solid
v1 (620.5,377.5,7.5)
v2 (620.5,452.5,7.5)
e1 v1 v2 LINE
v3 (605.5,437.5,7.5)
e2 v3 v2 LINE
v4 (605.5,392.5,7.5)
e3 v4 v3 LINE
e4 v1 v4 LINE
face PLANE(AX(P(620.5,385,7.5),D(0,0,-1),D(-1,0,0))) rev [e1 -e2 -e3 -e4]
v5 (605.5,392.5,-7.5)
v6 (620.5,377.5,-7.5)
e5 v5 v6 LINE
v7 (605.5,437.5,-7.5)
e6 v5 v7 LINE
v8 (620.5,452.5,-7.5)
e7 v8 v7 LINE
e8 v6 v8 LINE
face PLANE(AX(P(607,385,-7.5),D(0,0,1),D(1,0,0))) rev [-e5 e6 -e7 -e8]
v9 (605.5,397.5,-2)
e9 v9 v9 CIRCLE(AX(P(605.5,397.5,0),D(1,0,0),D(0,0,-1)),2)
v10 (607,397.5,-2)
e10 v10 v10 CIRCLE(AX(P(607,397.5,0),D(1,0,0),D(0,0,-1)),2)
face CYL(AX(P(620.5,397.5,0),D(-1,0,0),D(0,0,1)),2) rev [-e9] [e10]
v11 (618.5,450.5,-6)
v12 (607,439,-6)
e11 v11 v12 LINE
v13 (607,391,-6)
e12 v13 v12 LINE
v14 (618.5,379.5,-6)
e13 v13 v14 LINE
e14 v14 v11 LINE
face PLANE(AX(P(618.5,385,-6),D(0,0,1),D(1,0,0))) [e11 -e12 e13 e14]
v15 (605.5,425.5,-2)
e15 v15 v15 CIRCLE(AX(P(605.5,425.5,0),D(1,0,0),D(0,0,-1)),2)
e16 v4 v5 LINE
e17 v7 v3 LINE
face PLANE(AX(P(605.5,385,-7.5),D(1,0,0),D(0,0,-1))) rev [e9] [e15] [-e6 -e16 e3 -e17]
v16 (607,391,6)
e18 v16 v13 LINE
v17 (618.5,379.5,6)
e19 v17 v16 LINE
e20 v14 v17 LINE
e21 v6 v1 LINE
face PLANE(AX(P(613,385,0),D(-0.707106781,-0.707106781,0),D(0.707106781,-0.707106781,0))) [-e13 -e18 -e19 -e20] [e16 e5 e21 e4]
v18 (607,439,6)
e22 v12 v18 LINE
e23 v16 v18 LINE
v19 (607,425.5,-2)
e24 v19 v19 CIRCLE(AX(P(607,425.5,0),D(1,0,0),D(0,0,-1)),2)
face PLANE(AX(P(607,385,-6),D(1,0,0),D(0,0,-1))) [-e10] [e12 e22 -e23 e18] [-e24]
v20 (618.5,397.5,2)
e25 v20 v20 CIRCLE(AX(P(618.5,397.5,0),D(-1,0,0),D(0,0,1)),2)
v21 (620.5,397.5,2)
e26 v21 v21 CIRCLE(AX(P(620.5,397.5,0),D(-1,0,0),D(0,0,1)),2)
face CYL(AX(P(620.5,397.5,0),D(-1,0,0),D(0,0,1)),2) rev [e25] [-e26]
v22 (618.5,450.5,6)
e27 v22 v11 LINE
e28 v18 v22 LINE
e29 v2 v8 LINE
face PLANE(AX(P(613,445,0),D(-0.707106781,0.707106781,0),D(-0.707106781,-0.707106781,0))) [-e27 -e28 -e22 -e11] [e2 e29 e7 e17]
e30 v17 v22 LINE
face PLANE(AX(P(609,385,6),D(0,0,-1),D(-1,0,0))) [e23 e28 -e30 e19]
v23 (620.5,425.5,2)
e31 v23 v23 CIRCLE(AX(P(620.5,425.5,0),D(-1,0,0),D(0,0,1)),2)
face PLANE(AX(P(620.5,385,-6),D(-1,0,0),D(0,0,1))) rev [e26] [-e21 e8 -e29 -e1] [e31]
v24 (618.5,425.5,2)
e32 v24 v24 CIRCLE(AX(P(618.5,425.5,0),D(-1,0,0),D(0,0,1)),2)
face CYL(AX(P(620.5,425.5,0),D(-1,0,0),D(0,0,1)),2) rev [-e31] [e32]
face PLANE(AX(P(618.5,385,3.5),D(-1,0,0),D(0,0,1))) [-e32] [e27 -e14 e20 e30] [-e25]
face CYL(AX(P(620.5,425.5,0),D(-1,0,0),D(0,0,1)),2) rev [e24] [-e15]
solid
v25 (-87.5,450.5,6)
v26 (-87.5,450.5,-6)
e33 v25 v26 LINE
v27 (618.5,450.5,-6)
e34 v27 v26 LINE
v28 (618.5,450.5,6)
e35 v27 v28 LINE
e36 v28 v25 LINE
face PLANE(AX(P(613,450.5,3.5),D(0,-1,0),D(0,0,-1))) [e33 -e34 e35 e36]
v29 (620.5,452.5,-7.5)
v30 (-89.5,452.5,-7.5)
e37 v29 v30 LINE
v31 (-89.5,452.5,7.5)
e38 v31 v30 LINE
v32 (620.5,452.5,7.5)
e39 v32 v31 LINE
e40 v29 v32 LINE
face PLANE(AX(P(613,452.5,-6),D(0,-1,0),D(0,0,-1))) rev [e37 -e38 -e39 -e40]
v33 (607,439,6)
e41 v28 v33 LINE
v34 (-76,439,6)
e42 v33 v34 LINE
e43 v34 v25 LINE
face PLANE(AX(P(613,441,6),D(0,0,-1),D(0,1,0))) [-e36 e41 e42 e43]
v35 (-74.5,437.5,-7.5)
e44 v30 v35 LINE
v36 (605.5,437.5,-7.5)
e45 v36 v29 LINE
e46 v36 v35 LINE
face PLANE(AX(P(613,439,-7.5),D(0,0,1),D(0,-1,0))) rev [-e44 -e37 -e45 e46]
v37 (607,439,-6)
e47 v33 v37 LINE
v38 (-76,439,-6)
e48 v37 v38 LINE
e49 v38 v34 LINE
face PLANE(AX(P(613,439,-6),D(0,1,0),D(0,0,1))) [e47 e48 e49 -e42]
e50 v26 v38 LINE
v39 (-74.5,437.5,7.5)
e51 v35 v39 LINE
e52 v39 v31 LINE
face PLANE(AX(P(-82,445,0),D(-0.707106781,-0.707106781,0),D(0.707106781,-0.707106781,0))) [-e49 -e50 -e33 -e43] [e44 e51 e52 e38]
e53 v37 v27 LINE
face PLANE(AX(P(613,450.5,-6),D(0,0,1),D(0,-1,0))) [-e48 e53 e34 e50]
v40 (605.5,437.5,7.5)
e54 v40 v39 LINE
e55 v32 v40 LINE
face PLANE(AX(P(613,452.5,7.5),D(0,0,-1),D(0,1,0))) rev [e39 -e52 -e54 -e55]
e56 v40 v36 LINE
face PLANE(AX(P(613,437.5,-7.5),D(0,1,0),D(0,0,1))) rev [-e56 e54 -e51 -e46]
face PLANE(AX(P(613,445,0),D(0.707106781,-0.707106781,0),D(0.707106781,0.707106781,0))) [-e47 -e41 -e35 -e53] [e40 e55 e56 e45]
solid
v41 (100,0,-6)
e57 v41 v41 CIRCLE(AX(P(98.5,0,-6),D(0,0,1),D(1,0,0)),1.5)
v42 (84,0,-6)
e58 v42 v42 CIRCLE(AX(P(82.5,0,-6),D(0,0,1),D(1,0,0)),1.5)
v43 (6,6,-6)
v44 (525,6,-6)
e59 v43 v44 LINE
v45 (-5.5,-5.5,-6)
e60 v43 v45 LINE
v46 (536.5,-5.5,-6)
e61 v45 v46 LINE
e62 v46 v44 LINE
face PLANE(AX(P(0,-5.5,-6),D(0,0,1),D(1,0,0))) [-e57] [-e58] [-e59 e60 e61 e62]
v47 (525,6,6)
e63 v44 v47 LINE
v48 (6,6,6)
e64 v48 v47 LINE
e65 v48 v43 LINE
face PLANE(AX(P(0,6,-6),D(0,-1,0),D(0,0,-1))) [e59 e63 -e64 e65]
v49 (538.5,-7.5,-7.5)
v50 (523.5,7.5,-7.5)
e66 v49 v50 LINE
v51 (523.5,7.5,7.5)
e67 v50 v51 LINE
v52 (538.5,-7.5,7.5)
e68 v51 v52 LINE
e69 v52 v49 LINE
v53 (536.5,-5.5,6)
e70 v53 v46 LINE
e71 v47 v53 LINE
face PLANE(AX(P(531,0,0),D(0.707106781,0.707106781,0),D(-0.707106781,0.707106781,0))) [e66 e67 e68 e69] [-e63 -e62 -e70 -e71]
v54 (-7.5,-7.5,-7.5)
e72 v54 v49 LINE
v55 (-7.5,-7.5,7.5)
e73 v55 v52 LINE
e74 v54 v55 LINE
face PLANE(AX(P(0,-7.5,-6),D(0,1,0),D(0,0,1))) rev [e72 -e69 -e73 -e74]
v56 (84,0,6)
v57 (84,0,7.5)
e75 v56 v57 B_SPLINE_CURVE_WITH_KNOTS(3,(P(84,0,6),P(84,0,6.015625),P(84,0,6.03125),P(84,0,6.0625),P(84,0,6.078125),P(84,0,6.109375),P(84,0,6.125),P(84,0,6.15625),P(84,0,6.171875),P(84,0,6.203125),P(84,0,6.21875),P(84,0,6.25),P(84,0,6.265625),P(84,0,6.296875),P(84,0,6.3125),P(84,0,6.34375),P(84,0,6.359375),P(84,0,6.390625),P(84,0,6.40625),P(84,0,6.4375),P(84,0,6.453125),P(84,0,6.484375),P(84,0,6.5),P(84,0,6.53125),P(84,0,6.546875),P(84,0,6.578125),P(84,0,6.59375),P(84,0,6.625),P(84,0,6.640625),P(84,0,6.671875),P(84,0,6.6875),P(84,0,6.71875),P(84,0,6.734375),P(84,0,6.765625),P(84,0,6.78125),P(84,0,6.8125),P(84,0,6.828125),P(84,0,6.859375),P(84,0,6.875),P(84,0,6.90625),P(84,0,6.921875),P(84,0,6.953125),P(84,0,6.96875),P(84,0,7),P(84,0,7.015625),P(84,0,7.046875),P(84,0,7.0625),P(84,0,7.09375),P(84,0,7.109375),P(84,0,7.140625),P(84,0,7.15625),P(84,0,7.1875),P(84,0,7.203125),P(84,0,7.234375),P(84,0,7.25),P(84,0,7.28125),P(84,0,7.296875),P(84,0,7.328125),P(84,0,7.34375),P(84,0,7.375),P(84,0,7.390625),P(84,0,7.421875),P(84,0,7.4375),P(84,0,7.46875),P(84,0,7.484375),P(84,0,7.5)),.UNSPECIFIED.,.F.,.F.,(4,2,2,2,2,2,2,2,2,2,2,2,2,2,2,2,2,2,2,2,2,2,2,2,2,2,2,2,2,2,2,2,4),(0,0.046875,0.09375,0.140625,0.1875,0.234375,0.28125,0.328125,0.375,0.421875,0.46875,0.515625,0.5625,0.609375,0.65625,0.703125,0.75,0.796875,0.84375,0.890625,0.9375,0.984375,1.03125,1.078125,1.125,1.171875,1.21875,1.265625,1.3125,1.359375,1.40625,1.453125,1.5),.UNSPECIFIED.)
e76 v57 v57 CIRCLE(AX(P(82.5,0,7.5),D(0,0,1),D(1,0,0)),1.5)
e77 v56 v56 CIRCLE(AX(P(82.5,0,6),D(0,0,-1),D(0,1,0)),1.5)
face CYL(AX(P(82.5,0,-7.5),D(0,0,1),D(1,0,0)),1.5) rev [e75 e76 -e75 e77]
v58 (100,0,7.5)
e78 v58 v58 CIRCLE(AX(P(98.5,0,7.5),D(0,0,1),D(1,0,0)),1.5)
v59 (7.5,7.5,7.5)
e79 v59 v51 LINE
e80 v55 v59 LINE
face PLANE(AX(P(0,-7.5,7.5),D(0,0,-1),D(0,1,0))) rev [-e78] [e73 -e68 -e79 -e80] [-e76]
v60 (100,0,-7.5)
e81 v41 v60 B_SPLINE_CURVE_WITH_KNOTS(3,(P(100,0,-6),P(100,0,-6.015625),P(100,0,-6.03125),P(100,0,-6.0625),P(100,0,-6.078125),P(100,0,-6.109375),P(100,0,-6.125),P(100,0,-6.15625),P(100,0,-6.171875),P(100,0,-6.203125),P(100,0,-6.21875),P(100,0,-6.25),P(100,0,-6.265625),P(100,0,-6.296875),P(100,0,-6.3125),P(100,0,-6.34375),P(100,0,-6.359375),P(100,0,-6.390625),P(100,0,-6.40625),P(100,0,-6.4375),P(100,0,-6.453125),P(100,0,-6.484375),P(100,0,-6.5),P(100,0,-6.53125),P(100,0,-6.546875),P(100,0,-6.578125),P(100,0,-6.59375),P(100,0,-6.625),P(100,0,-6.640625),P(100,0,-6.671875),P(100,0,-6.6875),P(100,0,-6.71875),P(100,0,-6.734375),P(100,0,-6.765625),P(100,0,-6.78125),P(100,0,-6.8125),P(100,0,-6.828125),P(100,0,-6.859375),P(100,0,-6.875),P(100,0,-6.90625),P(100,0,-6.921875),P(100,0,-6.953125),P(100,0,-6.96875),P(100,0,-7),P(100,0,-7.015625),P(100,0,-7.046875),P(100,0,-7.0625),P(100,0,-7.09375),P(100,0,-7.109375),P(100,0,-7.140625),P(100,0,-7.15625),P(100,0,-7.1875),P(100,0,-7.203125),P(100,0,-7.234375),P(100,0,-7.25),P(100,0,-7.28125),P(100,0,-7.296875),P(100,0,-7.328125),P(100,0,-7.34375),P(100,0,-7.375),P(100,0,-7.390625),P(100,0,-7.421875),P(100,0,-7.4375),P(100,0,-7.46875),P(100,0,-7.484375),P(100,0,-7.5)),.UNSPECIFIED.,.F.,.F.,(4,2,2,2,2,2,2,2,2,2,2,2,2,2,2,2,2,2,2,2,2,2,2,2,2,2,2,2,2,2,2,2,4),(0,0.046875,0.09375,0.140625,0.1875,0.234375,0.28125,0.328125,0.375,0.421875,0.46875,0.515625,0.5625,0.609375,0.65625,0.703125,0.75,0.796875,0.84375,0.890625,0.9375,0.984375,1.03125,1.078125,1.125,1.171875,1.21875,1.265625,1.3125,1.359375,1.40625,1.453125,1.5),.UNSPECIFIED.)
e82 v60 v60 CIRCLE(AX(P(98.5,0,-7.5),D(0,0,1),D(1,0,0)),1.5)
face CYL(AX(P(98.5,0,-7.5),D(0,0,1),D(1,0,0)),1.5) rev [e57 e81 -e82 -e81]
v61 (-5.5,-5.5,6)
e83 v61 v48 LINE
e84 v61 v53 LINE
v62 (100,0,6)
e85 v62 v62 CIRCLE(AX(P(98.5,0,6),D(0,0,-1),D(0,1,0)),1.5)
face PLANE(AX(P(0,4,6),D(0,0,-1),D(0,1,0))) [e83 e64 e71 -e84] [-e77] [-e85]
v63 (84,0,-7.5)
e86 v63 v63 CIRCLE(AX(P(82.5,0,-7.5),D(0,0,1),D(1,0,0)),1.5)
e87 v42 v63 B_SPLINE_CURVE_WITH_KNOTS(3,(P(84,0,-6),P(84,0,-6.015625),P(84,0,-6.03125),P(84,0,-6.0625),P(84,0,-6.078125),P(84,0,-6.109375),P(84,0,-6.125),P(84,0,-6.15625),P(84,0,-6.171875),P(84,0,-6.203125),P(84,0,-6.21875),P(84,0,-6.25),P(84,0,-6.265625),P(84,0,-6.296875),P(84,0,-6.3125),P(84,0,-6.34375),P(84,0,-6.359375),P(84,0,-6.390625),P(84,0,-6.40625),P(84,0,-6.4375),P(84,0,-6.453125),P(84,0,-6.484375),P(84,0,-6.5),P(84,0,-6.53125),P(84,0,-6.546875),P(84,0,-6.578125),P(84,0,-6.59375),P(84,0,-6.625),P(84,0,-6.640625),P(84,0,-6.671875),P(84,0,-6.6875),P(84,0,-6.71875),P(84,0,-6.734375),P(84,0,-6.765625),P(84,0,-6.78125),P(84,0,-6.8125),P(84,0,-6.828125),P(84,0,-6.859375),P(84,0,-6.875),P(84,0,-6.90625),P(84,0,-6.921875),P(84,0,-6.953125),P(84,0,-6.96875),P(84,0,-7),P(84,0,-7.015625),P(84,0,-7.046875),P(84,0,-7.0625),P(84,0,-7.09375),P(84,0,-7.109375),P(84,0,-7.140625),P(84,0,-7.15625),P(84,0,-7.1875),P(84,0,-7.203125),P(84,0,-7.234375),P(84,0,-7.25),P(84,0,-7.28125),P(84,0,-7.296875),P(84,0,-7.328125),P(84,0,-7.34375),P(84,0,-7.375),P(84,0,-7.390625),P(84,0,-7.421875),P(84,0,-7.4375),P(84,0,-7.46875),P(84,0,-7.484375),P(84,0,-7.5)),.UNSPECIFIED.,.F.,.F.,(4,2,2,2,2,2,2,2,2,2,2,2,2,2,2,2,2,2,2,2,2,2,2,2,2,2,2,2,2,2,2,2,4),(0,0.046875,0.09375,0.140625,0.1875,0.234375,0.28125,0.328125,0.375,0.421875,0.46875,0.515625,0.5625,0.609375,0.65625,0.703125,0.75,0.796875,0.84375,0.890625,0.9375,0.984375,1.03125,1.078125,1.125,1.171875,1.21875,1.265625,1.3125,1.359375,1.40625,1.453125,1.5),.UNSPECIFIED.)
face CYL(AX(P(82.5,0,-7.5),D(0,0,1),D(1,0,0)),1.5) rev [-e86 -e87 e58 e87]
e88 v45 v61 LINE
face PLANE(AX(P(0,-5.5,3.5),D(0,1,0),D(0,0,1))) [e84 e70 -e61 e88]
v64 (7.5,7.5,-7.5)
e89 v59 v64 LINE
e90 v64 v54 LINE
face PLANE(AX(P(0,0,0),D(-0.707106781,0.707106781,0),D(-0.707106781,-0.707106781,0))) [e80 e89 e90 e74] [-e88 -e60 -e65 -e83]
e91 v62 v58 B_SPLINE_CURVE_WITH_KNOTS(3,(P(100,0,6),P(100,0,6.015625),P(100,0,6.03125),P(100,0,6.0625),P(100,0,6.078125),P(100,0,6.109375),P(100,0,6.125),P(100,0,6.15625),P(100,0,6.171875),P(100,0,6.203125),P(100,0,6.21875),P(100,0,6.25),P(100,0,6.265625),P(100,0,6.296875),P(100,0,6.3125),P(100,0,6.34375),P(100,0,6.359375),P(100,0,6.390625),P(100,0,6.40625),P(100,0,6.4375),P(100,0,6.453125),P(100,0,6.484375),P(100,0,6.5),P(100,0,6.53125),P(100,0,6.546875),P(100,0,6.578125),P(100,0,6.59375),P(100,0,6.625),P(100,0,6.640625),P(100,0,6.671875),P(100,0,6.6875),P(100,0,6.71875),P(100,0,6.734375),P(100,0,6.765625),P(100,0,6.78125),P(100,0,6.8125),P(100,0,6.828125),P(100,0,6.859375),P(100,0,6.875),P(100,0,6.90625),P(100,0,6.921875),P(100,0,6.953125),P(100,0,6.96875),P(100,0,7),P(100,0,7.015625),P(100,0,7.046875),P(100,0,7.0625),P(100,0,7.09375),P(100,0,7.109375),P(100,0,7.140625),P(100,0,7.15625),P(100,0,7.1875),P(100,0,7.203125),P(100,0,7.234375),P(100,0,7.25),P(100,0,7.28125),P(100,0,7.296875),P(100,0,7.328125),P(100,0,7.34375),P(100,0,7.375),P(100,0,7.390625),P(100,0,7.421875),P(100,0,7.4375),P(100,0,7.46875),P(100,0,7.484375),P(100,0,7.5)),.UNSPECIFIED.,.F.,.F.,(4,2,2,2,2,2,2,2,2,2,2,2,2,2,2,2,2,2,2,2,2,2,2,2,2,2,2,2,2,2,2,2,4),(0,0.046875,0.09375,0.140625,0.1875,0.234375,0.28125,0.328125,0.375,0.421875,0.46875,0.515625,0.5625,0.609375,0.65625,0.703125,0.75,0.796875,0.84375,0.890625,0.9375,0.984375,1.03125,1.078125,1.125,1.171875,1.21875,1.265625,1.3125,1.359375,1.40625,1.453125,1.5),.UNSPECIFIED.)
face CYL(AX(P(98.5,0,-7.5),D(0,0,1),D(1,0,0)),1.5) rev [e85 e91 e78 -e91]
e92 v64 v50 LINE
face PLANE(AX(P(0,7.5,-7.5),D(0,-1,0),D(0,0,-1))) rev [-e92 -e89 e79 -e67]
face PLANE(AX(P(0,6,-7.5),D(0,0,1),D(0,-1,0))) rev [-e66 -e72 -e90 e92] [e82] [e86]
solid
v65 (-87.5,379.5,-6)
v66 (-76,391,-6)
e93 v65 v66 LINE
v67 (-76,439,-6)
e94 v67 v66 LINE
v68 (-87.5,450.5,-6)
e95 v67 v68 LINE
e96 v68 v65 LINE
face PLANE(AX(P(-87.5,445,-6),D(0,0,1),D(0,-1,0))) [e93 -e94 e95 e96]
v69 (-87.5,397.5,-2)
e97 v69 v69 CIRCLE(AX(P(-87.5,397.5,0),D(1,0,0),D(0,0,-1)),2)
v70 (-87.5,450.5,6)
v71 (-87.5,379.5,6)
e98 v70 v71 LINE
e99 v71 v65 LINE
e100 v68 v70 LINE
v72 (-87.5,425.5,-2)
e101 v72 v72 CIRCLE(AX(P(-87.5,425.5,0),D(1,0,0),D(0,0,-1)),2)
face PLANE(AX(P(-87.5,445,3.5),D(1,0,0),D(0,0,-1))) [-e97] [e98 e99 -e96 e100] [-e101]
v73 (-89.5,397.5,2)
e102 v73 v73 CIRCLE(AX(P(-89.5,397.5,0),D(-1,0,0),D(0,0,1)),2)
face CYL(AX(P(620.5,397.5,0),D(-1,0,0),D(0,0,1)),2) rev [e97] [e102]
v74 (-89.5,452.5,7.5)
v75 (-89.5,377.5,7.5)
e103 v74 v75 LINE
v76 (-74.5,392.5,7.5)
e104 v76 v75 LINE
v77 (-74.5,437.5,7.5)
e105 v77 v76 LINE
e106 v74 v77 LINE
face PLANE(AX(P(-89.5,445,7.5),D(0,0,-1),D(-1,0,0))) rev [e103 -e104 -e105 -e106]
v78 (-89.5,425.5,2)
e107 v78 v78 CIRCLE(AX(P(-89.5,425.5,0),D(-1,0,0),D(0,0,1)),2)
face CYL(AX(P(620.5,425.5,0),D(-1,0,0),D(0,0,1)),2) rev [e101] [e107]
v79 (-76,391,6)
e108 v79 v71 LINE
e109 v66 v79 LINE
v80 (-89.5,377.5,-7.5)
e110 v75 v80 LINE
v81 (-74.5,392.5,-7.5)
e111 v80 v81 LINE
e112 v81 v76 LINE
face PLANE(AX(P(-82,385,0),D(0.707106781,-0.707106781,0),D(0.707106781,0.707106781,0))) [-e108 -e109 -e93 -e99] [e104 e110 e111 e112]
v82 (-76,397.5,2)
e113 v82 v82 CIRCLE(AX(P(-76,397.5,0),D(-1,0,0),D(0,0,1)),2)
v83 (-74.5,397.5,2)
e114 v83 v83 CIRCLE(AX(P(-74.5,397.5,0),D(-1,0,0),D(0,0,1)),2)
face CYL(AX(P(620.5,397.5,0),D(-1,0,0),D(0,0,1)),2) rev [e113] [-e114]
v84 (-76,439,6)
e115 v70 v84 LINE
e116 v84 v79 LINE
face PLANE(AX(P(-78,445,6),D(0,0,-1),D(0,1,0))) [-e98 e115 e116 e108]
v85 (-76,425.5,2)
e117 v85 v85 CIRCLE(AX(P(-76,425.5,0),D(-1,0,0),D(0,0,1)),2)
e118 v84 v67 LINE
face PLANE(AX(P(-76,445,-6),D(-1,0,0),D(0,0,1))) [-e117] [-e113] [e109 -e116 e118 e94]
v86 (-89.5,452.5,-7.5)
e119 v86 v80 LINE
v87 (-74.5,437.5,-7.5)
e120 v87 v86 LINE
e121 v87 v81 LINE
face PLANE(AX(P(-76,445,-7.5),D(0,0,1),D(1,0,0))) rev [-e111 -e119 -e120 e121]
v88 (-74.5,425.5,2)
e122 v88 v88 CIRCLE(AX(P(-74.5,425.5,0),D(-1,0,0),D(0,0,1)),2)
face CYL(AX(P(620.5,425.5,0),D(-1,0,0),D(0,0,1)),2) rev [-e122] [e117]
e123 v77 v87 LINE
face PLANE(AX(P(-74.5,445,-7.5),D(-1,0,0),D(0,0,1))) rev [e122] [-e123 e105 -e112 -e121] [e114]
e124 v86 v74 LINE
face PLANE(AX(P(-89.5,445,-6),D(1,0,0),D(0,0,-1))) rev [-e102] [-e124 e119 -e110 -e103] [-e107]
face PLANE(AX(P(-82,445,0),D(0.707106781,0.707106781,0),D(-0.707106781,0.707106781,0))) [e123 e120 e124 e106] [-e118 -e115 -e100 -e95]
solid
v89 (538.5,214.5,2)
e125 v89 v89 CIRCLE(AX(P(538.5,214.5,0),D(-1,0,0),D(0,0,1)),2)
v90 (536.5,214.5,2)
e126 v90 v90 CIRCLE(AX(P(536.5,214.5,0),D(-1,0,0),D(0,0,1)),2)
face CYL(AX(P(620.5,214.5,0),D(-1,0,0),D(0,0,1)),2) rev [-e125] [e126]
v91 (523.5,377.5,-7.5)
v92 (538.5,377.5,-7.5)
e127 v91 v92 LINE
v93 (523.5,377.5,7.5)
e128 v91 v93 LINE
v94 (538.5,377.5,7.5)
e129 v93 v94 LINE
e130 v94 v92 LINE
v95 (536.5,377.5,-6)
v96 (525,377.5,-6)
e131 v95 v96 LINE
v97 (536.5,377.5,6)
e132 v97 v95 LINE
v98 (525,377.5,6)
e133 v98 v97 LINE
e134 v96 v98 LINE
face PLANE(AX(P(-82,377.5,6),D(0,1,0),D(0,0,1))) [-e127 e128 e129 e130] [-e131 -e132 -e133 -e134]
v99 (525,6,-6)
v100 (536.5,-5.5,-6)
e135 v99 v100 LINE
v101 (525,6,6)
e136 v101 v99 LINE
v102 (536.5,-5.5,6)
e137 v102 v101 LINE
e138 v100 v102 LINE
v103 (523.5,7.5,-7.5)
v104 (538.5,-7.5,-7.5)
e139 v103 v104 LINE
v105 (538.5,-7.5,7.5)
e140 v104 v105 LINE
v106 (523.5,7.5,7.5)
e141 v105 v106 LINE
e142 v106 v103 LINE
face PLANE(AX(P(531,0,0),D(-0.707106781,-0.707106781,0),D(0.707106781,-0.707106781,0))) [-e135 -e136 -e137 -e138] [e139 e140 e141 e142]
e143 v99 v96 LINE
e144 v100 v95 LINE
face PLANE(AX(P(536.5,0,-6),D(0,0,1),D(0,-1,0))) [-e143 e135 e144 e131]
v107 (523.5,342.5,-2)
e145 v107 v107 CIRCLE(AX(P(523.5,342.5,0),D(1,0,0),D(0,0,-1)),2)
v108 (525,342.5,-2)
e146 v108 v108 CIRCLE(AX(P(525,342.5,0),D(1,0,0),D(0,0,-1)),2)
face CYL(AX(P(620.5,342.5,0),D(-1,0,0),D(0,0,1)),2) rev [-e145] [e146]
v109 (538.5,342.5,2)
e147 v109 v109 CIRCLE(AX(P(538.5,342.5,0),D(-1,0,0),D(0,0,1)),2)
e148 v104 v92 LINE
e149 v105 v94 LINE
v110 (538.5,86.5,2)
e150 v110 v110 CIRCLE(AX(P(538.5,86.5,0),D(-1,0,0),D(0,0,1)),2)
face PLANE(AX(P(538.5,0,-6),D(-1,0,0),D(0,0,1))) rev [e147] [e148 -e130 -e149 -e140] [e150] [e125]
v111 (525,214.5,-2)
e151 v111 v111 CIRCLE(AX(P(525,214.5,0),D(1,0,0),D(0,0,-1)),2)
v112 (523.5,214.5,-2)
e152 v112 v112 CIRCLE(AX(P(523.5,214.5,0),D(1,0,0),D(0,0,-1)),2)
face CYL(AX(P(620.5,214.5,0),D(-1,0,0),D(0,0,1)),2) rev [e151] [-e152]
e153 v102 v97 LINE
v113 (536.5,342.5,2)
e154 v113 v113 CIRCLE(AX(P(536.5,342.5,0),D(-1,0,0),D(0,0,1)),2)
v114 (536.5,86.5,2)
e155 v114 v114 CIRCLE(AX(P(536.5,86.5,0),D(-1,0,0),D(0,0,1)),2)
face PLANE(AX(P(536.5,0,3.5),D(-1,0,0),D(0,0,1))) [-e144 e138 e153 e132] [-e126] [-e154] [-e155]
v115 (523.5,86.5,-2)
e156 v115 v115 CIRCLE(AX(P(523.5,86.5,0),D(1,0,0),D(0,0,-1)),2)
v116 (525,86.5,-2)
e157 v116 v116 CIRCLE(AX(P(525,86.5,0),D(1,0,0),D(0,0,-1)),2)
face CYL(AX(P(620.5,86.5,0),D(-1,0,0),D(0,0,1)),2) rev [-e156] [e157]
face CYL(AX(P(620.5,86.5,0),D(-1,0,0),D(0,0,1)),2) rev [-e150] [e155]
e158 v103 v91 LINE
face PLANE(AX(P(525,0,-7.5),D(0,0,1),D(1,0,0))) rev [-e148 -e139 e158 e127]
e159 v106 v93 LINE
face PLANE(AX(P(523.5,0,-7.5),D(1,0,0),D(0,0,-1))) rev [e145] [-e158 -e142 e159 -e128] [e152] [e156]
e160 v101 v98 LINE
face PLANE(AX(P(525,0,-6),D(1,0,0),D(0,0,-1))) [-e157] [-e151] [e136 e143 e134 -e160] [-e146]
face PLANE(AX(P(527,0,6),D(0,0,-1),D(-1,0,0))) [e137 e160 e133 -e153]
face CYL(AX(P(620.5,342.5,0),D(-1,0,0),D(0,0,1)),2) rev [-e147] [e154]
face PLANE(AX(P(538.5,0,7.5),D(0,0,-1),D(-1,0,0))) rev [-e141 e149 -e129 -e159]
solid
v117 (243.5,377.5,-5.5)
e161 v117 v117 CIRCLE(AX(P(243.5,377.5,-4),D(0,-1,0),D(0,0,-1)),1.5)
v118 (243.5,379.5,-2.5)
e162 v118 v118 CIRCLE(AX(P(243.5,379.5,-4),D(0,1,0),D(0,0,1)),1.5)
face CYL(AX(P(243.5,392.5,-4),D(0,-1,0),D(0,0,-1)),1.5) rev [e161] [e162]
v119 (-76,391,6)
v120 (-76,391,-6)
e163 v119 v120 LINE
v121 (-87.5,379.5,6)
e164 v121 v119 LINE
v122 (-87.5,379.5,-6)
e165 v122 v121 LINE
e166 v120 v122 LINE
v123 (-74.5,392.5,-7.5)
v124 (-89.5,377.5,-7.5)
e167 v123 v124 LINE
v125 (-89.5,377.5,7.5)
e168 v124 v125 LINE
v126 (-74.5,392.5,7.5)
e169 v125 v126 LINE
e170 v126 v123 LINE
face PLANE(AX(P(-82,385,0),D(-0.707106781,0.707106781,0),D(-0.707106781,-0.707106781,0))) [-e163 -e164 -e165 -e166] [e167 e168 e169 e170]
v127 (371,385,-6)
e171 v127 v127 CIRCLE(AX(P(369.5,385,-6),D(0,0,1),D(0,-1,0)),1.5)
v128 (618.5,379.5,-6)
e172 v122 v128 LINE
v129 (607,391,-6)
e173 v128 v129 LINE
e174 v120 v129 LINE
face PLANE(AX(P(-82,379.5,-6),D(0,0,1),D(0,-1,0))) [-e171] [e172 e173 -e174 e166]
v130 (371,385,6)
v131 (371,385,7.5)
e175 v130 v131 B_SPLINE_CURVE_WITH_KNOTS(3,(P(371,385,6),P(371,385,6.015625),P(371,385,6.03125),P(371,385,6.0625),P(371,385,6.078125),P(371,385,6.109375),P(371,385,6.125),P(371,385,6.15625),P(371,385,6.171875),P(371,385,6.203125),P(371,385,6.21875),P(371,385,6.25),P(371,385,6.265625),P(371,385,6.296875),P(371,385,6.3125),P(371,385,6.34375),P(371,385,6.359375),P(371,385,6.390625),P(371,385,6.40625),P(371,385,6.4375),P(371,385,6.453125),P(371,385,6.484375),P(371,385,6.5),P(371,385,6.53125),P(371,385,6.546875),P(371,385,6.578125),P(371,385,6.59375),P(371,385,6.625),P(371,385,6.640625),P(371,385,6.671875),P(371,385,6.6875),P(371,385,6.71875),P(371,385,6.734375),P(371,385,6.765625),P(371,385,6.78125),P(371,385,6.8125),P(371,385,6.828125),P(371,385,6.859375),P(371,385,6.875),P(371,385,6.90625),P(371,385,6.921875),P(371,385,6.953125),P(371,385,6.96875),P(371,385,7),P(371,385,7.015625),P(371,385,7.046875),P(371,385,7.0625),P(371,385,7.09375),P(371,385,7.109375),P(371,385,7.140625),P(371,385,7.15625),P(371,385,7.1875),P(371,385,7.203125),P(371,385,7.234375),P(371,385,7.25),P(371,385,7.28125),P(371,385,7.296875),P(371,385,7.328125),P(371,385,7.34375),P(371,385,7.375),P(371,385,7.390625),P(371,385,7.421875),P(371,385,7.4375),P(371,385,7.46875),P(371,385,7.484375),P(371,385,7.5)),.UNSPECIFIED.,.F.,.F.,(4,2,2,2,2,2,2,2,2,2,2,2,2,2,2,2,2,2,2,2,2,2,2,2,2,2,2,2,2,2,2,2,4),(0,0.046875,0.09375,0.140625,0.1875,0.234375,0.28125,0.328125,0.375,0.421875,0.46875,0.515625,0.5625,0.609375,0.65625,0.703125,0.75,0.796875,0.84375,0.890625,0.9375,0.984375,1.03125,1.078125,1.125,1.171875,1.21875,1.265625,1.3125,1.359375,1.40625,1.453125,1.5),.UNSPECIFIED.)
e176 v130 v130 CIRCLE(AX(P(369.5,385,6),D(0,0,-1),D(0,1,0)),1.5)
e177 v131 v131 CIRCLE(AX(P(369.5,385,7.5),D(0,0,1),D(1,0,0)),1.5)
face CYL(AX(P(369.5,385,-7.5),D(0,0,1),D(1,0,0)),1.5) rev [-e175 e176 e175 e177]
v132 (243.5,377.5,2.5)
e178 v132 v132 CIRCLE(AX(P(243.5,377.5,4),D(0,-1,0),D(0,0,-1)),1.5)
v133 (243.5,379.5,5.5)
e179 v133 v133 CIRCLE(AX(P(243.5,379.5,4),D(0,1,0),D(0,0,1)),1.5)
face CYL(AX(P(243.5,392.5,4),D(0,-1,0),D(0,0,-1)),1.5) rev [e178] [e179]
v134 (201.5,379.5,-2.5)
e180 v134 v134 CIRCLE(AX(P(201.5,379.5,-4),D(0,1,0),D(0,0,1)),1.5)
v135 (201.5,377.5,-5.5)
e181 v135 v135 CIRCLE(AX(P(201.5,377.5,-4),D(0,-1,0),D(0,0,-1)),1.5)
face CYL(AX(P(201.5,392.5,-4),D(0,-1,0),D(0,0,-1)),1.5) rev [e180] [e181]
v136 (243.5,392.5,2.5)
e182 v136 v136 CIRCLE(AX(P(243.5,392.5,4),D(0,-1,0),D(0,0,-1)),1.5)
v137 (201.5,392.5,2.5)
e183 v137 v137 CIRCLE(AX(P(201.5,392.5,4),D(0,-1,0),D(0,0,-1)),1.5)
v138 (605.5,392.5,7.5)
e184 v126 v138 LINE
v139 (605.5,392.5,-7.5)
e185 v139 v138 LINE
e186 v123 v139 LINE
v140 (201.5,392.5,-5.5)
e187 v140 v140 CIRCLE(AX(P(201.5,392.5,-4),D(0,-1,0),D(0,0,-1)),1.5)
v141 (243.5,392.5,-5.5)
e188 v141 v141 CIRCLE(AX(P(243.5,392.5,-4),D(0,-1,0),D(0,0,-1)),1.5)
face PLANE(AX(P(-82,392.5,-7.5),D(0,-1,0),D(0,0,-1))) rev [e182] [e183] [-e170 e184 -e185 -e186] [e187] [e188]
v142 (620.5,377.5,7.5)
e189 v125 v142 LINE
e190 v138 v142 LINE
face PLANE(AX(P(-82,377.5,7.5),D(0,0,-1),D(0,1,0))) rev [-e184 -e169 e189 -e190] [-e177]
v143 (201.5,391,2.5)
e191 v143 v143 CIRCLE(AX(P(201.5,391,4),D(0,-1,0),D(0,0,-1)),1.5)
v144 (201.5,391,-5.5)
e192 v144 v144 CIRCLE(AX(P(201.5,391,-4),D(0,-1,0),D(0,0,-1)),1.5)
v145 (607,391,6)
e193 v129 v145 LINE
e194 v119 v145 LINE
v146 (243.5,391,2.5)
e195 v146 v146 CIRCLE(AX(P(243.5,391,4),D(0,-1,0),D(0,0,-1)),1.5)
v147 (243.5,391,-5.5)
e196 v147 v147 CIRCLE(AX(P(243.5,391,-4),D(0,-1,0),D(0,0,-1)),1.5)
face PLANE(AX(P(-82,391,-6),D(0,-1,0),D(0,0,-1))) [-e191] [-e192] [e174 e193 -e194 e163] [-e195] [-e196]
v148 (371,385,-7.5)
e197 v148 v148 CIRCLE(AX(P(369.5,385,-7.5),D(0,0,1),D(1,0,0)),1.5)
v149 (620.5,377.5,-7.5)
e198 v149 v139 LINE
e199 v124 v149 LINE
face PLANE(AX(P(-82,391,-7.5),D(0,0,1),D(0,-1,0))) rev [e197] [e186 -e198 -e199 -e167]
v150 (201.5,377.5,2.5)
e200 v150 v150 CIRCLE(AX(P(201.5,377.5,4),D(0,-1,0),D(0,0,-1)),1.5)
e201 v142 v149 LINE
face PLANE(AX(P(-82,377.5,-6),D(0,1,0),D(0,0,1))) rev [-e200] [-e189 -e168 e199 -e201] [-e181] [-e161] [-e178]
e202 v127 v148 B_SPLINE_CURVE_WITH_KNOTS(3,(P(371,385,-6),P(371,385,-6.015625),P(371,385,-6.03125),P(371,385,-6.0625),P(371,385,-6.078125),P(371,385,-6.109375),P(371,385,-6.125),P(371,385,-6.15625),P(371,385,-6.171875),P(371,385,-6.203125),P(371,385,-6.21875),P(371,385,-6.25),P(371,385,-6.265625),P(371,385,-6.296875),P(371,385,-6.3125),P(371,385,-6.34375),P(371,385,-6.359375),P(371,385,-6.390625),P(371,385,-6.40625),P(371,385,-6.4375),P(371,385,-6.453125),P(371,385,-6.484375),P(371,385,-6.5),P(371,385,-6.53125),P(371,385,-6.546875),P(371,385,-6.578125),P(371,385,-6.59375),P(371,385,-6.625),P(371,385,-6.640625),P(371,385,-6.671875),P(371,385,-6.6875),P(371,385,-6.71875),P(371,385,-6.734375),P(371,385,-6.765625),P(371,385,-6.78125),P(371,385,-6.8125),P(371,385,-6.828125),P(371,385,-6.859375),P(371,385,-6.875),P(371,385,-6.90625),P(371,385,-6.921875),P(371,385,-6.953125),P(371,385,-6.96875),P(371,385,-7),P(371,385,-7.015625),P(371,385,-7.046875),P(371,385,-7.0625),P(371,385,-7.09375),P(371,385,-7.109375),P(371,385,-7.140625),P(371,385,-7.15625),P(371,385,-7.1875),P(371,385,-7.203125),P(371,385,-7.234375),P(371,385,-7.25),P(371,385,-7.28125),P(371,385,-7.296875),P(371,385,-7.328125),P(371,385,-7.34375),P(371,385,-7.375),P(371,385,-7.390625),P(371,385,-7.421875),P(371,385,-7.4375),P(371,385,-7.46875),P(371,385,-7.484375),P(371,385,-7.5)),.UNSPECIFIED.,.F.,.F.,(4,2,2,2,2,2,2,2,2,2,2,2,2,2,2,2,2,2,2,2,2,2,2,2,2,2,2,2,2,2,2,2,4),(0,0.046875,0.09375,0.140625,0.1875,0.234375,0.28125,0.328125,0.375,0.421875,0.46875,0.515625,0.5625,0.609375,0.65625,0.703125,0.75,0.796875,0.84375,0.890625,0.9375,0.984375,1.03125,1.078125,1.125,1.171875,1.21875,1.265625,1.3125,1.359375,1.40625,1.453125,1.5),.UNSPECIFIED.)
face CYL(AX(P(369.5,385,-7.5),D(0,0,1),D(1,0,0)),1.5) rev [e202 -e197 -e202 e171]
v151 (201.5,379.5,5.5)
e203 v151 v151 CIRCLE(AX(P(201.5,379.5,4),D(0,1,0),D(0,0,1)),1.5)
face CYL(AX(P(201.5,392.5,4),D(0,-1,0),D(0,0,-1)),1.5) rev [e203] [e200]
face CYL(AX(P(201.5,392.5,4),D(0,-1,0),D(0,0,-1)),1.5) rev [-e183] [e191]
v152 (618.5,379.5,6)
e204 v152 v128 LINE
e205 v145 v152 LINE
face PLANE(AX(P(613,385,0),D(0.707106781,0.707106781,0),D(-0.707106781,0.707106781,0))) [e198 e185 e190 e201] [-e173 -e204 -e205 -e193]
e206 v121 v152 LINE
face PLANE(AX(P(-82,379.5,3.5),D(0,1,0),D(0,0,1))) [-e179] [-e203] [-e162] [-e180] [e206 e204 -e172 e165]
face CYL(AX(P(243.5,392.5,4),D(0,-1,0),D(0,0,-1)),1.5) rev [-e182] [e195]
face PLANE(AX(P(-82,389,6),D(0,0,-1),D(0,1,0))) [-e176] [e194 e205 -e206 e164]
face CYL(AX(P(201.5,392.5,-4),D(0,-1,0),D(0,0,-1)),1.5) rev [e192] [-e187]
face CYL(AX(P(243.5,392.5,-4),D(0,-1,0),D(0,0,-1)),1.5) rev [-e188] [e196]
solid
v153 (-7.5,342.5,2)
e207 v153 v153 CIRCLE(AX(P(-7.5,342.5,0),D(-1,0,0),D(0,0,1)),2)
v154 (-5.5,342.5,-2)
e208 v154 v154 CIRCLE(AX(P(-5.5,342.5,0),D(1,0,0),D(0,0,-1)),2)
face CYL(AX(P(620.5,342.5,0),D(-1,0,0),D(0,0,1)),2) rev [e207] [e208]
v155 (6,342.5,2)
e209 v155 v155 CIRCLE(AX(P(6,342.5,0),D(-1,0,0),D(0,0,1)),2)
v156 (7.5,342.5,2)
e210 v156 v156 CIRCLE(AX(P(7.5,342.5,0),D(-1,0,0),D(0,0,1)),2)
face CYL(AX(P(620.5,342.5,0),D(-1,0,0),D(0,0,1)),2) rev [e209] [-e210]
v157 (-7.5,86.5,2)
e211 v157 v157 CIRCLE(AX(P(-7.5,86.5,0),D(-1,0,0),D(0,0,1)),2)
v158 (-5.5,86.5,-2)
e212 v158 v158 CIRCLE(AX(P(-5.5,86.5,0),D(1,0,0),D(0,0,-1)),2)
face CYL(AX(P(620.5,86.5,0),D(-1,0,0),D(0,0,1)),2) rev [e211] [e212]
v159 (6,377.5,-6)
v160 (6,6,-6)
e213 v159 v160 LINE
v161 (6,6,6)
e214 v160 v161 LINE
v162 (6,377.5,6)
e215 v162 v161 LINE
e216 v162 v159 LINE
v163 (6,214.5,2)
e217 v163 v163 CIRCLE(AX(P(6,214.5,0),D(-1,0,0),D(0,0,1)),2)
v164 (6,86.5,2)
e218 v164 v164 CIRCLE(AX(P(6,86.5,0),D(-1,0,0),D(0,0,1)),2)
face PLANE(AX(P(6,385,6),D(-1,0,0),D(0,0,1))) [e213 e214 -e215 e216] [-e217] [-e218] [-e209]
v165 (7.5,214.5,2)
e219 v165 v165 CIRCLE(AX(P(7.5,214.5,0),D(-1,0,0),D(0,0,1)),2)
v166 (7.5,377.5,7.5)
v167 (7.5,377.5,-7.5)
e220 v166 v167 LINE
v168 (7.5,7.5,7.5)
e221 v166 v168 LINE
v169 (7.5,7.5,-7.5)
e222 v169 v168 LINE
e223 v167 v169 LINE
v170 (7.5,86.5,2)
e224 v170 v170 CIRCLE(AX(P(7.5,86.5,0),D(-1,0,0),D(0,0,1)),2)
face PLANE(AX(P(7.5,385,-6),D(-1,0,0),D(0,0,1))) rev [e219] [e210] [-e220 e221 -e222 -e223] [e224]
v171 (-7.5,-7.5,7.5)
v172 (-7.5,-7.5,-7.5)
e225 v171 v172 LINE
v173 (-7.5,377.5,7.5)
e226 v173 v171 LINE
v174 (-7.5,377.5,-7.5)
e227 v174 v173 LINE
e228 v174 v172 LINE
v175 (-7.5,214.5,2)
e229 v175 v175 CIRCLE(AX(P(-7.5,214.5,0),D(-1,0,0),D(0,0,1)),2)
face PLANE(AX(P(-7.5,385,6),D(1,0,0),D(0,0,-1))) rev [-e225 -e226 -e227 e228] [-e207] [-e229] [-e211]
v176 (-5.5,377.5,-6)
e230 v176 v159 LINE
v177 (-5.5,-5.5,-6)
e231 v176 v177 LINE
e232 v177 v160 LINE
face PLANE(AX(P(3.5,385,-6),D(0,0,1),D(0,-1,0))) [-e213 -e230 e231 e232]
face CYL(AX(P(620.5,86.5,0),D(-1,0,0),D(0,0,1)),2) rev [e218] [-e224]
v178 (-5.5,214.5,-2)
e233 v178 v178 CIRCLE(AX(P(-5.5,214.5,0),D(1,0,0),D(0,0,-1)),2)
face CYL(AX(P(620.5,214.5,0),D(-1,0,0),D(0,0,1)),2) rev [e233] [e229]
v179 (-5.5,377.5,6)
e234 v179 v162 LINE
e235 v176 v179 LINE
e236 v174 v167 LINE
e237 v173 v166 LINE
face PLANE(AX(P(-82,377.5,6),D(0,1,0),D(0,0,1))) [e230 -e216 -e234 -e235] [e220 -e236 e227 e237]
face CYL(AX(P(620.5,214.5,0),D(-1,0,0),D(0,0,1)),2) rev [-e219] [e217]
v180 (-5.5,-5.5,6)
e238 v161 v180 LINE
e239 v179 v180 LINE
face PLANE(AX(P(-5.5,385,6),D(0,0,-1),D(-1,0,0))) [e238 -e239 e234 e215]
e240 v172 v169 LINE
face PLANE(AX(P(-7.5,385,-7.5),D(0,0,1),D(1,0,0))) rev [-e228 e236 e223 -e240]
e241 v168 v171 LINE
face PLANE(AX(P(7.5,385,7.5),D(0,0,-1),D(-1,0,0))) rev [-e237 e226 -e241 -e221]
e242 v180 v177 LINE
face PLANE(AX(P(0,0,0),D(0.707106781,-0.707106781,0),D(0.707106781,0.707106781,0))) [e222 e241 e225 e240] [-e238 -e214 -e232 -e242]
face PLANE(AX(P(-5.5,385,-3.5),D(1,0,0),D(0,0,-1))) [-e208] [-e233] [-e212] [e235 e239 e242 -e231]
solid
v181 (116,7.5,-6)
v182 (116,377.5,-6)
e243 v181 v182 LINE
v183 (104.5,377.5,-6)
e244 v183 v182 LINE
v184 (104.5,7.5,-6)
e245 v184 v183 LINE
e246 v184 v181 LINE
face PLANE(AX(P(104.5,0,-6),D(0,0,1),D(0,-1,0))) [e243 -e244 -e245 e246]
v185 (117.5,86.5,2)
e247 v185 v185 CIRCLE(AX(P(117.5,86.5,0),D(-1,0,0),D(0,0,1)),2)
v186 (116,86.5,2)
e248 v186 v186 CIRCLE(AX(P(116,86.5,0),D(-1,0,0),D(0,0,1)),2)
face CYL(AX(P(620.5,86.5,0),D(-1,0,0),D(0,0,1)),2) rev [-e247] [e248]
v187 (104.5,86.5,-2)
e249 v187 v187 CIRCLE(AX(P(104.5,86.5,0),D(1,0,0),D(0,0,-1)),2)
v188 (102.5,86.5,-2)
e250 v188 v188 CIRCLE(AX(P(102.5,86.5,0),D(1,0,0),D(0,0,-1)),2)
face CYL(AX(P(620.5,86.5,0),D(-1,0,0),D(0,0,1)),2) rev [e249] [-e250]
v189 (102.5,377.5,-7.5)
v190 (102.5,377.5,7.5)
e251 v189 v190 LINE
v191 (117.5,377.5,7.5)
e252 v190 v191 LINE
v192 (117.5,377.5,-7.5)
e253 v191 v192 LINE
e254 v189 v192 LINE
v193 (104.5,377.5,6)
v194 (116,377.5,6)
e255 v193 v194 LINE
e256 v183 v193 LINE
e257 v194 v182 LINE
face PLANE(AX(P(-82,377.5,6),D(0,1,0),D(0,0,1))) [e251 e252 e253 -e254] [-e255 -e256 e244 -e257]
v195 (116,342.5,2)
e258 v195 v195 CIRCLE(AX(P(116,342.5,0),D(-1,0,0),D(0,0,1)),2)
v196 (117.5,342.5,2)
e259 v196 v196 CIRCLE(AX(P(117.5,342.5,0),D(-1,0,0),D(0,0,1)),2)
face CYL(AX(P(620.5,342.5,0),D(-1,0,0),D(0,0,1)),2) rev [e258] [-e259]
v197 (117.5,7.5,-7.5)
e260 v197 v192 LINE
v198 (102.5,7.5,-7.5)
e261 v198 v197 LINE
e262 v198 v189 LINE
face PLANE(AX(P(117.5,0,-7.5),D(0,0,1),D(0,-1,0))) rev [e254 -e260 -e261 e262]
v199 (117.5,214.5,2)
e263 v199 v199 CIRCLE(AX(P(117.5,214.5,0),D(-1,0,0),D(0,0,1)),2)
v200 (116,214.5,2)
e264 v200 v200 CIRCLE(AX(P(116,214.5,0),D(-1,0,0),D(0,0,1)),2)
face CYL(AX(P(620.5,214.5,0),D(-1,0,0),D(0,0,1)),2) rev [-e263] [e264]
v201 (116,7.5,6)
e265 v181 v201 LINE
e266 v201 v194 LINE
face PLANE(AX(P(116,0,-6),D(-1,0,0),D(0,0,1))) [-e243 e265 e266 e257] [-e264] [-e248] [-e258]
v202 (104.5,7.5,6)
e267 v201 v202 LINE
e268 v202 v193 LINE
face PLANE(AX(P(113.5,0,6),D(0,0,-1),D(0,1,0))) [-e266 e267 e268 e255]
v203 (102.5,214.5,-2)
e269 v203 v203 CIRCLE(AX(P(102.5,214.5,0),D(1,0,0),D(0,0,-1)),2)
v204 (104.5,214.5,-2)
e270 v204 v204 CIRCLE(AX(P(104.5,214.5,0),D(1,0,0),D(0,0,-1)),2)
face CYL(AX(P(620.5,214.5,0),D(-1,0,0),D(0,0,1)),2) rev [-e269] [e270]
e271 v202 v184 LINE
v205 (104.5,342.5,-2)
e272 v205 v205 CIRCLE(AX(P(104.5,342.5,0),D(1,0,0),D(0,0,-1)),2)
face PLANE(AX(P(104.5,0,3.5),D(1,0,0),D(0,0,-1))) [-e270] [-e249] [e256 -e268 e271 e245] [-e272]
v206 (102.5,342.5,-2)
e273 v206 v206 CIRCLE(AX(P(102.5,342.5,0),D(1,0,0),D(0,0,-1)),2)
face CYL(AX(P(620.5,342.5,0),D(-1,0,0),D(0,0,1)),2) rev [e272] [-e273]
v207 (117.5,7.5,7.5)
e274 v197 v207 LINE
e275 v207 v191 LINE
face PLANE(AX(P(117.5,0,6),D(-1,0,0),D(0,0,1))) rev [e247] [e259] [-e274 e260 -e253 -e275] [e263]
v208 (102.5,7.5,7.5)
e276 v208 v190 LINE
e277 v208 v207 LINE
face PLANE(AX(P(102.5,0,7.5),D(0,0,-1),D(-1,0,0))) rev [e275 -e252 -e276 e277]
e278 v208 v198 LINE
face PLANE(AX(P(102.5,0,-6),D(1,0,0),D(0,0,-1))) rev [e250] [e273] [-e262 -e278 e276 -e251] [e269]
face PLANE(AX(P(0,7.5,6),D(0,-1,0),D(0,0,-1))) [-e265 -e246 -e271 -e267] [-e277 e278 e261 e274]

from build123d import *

# Parameters (mm, degrees)
MEMBER_START                     = -7.5
MEMBER_15_15_1_5_10_DEPTH        = 15
MEMBER_15_15_1_5_10_2_DEPTH      = 1.5
MEMBER_START_2                   = 6
MEMBER_15_15_1_5_10_3_DEPTH      = 1.5
MEMBER_15_15_1_5_10_4_DEPTH      = 15
MEMBER_15_15_1_5_10_5_DEPTH      = 1.5
MEMBER_15_15_1_5_10_6_DEPTH      = 1.5
MEMBER_15_15_1_5_10_7_DEPTH      = 15
MEMBER_15_15_1_5_10_8_DEPTH      = 1.5
MEMBER_15_15_1_5_10_9_DEPTH      = 1.5
MEMBER_15_15_1_5_10_10_DEPTH     = 15
MEMBER_15_15_1_5_10_11_DEPTH     = 1.5
MEMBER_15_15_1_5_10_12_DEPTH     = 1.5
MEMBER_15_15_1_5_10_13_DEPTH     = 15
MEMBER_15_15_1_5_10_14_DEPTH     = 1.5
MEMBER_15_15_1_5_10_15_DEPTH     = 1.5
MEMBER_15_15_1_5_10_16_DEPTH     = 15
MEMBER_15_15_1_5_10_17_DEPTH     = 1.5
MEMBER_15_15_1_5_10_18_DEPTH     = 1.5
MEMBER_15_15_1_5_10_19_DEPTH     = 15
MEMBER_15_15_1_5_10_20_DEPTH     = 1.5
MEMBER_15_15_1_5_10_21_DEPTH     = 1.5
MEMBER_START_3                   = 102.5
MEMBER_15_15_1_5_10_22_OUTLINE_W = 370
MEMBER_15_15_1_5_10_22_OUTLINE_H = 1.5
MEMBER_15_15_1_5_10_22_DEPTH     = 15
MEMBER_15_15_1_5_10_23_OUTLINE_W = 370
MEMBER_15_15_1_5_10_23_OUTLINE_H = 12
MEMBER_15_15_1_5_10_23_DEPTH     = 2
MEMBER_START_4                   = 116
MEMBER_15_15_1_5_10_24_OUTLINE_W = 370
MEMBER_15_15_1_5_10_24_OUTLINE_H = 12
MEMBER_15_15_1_5_10_24_DEPTH     = 1.5
SKETCH_2_R                       = 2
CUT_EXTRUDE_2_DEPTH              = 775.077838463
SKETCH_3_R                       = 2
CUT_EXTRUDE_3_DEPTH              = 842.969417497
SKETCH_4_R                       = 1.5
CUT_EXTRUDE_4_DEPTH              = 15
SKETCH_5_R                       = 1.5
CUT_EXTRUDE_5_DEPTH              = 769.115551203
SKETCH_6_R                       = 1.5
CUT_EXTRUDE_6_DEPTH              = 769.115551203


# Read off the part's stored shape, not the designer's step: 方形管 15 ×15× 1.5(10)
with BuildPart() as part:
    # Member 15 _15_ 1.5_10 outline → Member 15 _15_ 1.5_10 (new body)
    with BuildSketch(Plane.XY.offset(MEMBER_START)):
        Polygon((-74.5, 392.5), (-74.5, 437.5), (-76, 439), (-76, 391), align=None)
        Polygon((-87.5, 379.5), (-87.5, 450.5), (-89.5, 452.5), (-89.5, 377.5), align=None)
    extrude(amount=MEMBER_15_15_1_5_10_DEPTH)

    # Member 15 _15_ 1.5_10 2 outline → Member 15 _15_ 1.5_10 2 (add)
    with BuildSketch(Plane.XY.offset(MEMBER_START)):
        Polygon((-76, 391), (-76, 439), (-87.5, 450.5), (-87.5, 379.5), align=None)
    extrude(amount=MEMBER_15_15_1_5_10_2_DEPTH)

    # Member 15 _15_ 1.5_10 3 outline → Member 15 _15_ 1.5_10 3 (add)
    with BuildSketch(Plane.XY.offset(MEMBER_START_2)):
        Polygon((-76, 391), (-76, 439), (-87.5, 450.5), (-87.5, 379.5), align=None)
    extrude(amount=MEMBER_15_15_1_5_10_3_DEPTH)


with BuildPart() as body_2:
    # Member 15 _15_ 1.5_10 4 outline → Member 15 _15_ 1.5_10 4 (new body)
    with BuildSketch(Plane.XY.offset(MEMBER_START)):
        Polygon((605.5, 392.5), (-74.5, 392.5), (-76, 391), (607, 391), align=None)
        Polygon((618.5, 379.5), (-87.5, 379.5), (-89.5, 377.5), (620.5, 377.5), align=None)
    extrude(amount=MEMBER_15_15_1_5_10_4_DEPTH)

    # Member 15 _15_ 1.5_10 5 outline → Member 15 _15_ 1.5_10 5 (add)
    with BuildSketch(Plane.XY.offset(MEMBER_START)):
        Polygon((607, 391), (-76, 391), (-87.5, 379.5), (618.5, 379.5), align=None)
    extrude(amount=MEMBER_15_15_1_5_10_5_DEPTH)

    # Member 15 _15_ 1.5_10 6 outline → Member 15 _15_ 1.5_10 6 (add)
    with BuildSketch(Plane.XY.offset(MEMBER_START_2)):
        Polygon((607, 391), (-76, 391), (-87.5, 379.5), (618.5, 379.5), align=None)
    extrude(amount=MEMBER_15_15_1_5_10_6_DEPTH)

    # 草图4 → 切除-拉伸4 (cut)
    with BuildSketch(Plane.XZ.offset(-377.5)):
        with Locations(Location((201.5, 4, 0), (0, 0, 270))):
            Circle(SKETCH_4_R)
        with Locations(Location((243.5, 4, 0), (0, 0, 270))):
            Circle(SKETCH_4_R)
        with Locations(Location((243.5, -4, 0), (0, 0, 270))):
            Circle(SKETCH_4_R)
        with Locations(Location((201.5, -4, 0), (0, 0, 270))):
            Circle(SKETCH_4_R)
    extrude(amount=-CUT_EXTRUDE_4_DEPTH, mode=Mode.SUBTRACT)

    # 草图5 → 切除-拉伸5 (cut, through all)
    with BuildSketch(Plane.XY.offset(7.5)):
        with Locations((369.5, 385)):
            Circle(SKETCH_5_R)
    extrude(amount=-CUT_EXTRUDE_5_DEPTH, mode=Mode.SUBTRACT)


with BuildPart() as body_3:
    # Member 15 _15_ 1.5_10 7 outline → Member 15 _15_ 1.5_10 7 (new body)
    with BuildSketch(Plane.XY.offset(MEMBER_START)):
        Polygon((-74.5, 437.5), (605.5, 437.5), (607, 439), (-76, 439), align=None)
        Polygon((-87.5, 450.5), (618.5, 450.5), (620.5, 452.5), (-89.5, 452.5), align=None)
    extrude(amount=MEMBER_15_15_1_5_10_7_DEPTH)

    # Member 15 _15_ 1.5_10 8 outline → Member 15 _15_ 1.5_10 8 (add)
    with BuildSketch(Plane.XY.offset(MEMBER_START)):
        Polygon((-76, 439), (607, 439), (618.5, 450.5), (-87.5, 450.5), align=None)
    extrude(amount=MEMBER_15_15_1_5_10_8_DEPTH)

    # Member 15 _15_ 1.5_10 9 outline → Member 15 _15_ 1.5_10 9 (add)
    with BuildSketch(Plane.XY.offset(MEMBER_START_2)):
        Polygon((-76, 439), (607, 439), (618.5, 450.5), (-87.5, 450.5), align=None)
    extrude(amount=MEMBER_15_15_1_5_10_9_DEPTH)


with BuildPart() as body_4:
    # Member 15 _15_ 1.5_10 10 outline → Member 15 _15_ 1.5_10 10 (new body)
    with BuildSketch(Plane.XY.offset(MEMBER_START)):
        Polygon((605.5, 437.5), (605.5, 392.5), (607, 391), (607, 439), align=None)
        Polygon((618.5, 450.5), (618.5, 379.5), (620.5, 377.5), (620.5, 452.5), align=None)
    extrude(amount=MEMBER_15_15_1_5_10_10_DEPTH)

    # Member 15 _15_ 1.5_10 11 outline → Member 15 _15_ 1.5_10 11 (add)
    with BuildSketch(Plane.XY.offset(MEMBER_START)):
        Polygon((607, 439), (607, 391), (618.5, 379.5), (618.5, 450.5), align=None)
    extrude(amount=MEMBER_15_15_1_5_10_11_DEPTH)

    # Member 15 _15_ 1.5_10 12 outline → Member 15 _15_ 1.5_10 12 (add)
    with BuildSketch(Plane.XY.offset(MEMBER_START_2)):
        Polygon((607, 439), (607, 391), (618.5, 379.5), (618.5, 450.5), align=None)
    extrude(amount=MEMBER_15_15_1_5_10_12_DEPTH)


with BuildPart() as body_5:
    # Member 15 _15_ 1.5_10 13 outline → Member 15 _15_ 1.5_10 13 (new body)
    with BuildSketch(Plane.XY.offset(MEMBER_START)):
        Polygon((523.5, 377.5), (523.5, 7.5), (525, 6), (525, 377.5), align=None)
        Polygon((536.5, 377.5), (536.5, -5.5), (538.5, -7.5), (538.5, 377.5), align=None)
    extrude(amount=MEMBER_15_15_1_5_10_13_DEPTH)

    # Member 15 _15_ 1.5_10 14 outline → Member 15 _15_ 1.5_10 14 (add)
    with BuildSketch(Plane.XY.offset(MEMBER_START)):
        Polygon((525, 377.5), (525, 6), (536.5, -5.5), (536.5, 377.5), align=None)
    extrude(amount=MEMBER_15_15_1_5_10_14_DEPTH)

    # Member 15 _15_ 1.5_10 15 outline → Member 15 _15_ 1.5_10 15 (add)
    with BuildSketch(Plane.XY.offset(MEMBER_START_2)):
        Polygon((525, 377.5), (525, 6), (536.5, -5.5), (536.5, 377.5), align=None)
    extrude(amount=MEMBER_15_15_1_5_10_15_DEPTH)


with BuildPart() as body_6:
    # Member 15 _15_ 1.5_10 16 outline → Member 15 _15_ 1.5_10 16 (new body)
    with BuildSketch(Plane.XY.offset(MEMBER_START)):
        Polygon((523.5, 7.5), (7.5, 7.5), (6, 6), (525, 6), align=None)
        Polygon((536.5, -5.5), (-5.5, -5.5), (-7.5, -7.5), (538.5, -7.5), align=None)
    extrude(amount=MEMBER_15_15_1_5_10_16_DEPTH)

    # Member 15 _15_ 1.5_10 17 outline → Member 15 _15_ 1.5_10 17 (add)
    with BuildSketch(Plane.XY.offset(MEMBER_START)):
        Polygon((525, 6), (6, 6), (-5.5, -5.5), (536.5, -5.5), align=None)
    extrude(amount=MEMBER_15_15_1_5_10_17_DEPTH)

    # Member 15 _15_ 1.5_10 18 outline → Member 15 _15_ 1.5_10 18 (add)
    with BuildSketch(Plane.XY.offset(MEMBER_START_2)):
        Polygon((525, 6), (6, 6), (-5.5, -5.5), (536.5, -5.5), align=None)
    extrude(amount=MEMBER_15_15_1_5_10_18_DEPTH)

    # 草图6 → 切除-拉伸6 (cut, through all)
    with BuildSketch(Plane.XY.offset(7.5)):
        with Locations((82.5, 0)):
            Circle(SKETCH_6_R)
        with Locations((98.5, 0)):
            Circle(SKETCH_6_R)
    extrude(amount=-CUT_EXTRUDE_6_DEPTH, mode=Mode.SUBTRACT)


with BuildPart() as body_7:
    # Member 15 _15_ 1.5_10 19 outline → Member 15 _15_ 1.5_10 19 (new body)
    with BuildSketch(Plane.XY.offset(MEMBER_START)):
        Polygon((7.5, 7.5), (7.5, 377.5), (6, 377.5), (6, 6), align=None)
        Polygon((-5.5, -5.5), (-5.5, 377.5), (-7.5, 377.5), (-7.5, -7.5), align=None)
    extrude(amount=MEMBER_15_15_1_5_10_19_DEPTH)

    # Member 15 _15_ 1.5_10 20 outline → Member 15 _15_ 1.5_10 20 (add)
    with BuildSketch(Plane.XY.offset(MEMBER_START)):
        Polygon((6, 6), (6, 377.5), (-5.5, 377.5), (-5.5, -5.5), align=None)
    extrude(amount=MEMBER_15_15_1_5_10_20_DEPTH)

    # Member 15 _15_ 1.5_10 21 outline → Member 15 _15_ 1.5_10 21 (add)
    with BuildSketch(Plane.XY.offset(MEMBER_START_2)):
        Polygon((6, 6), (6, 377.5), (-5.5, 377.5), (-5.5, -5.5), align=None)
    extrude(amount=MEMBER_15_15_1_5_10_21_DEPTH)


with BuildPart() as body_8:
    # Member 15 _15_ 1.5_10 22 outline → Member 15 _15_ 1.5_10 22 (new body)
    with BuildSketch(Plane.YZ.offset(MEMBER_START_3)):
        with Locations((192.5, -6.75)):
            Rectangle(MEMBER_15_15_1_5_10_22_OUTLINE_W, MEMBER_15_15_1_5_10_22_OUTLINE_H)
        with Locations((192.5, 6.75)):
            Rectangle(MEMBER_15_15_1_5_10_22_OUTLINE_W, MEMBER_15_15_1_5_10_22_OUTLINE_H)
    extrude(amount=MEMBER_15_15_1_5_10_22_DEPTH)

    # Member 15 _15_ 1.5_10 23 outline → Member 15 _15_ 1.5_10 23 (add)
    with BuildSketch(Plane.YZ.offset(MEMBER_START_3)):
        with Locations((192.5, 0)):
            Rectangle(MEMBER_15_15_1_5_10_23_OUTLINE_W, MEMBER_15_15_1_5_10_23_OUTLINE_H)
    extrude(amount=MEMBER_15_15_1_5_10_23_DEPTH)

    # Member 15 _15_ 1.5_10 24 outline → Member 15 _15_ 1.5_10 24 (add)
    with BuildSketch(Plane.YZ.offset(MEMBER_START_4)):
        with Locations((192.5, 0)):
            Rectangle(MEMBER_15_15_1_5_10_24_OUTLINE_W, MEMBER_15_15_1_5_10_24_OUTLINE_H)
    extrude(amount=MEMBER_15_15_1_5_10_24_DEPTH)


with BuildPart() as cut_extrude_2_tool:
    # 草图2 → 切除-拉伸2 (new, through all)
    with BuildSketch(Plane.ZY.offset(7.5)):
        with Locations((0, 86.5)):
            Circle(SKETCH_2_R)
        with Locations((0, 214.5)):
            Circle(SKETCH_2_R)
        with Locations((0, 342.5)):
            Circle(SKETCH_2_R)
    extrude(amount=-CUT_EXTRUDE_2_DEPTH)


with BuildPart() as body_5_1:
    add(body_5.part)

    # 切除-拉伸2: cut by cut_extrude_2_tool
    add(cut_extrude_2_tool.part, mode=Mode.SUBTRACT)


with BuildPart() as body_7_1:
    add(body_7.part)

    # 切除-拉伸2: cut by cut_extrude_2_tool
    add(cut_extrude_2_tool.part, mode=Mode.SUBTRACT)


with BuildPart() as body_8_1:
    add(body_8.part)

    # 切除-拉伸2: cut by cut_extrude_2_tool
    add(cut_extrude_2_tool.part, mode=Mode.SUBTRACT)


with BuildPart() as cut_extrude_3_tool:
    # 草图3 → 切除-拉伸3 (new, through all)
    with BuildSketch(Plane.ZY.offset(89.5)):
        with Locations((0, 425.5)):
            Circle(SKETCH_3_R)
        with Locations((0, 397.5)):
            Circle(SKETCH_3_R)
    extrude(amount=-CUT_EXTRUDE_3_DEPTH)


with BuildPart() as part_1:
    add(part.part)

    # 切除-拉伸3: cut by cut_extrude_3_tool
    add(cut_extrude_3_tool.part, mode=Mode.SUBTRACT)


with BuildPart() as body_4_1:
    add(body_4.part)

    # 切除-拉伸3: cut by cut_extrude_3_tool
    add(cut_extrude_3_tool.part, mode=Mode.SUBTRACT)


solid = Compound([body_2.part, body_3.part, body_6.part, body_5_1.part, body_7_1.part, body_8_1.part, part_1.part, body_4_1.part])
